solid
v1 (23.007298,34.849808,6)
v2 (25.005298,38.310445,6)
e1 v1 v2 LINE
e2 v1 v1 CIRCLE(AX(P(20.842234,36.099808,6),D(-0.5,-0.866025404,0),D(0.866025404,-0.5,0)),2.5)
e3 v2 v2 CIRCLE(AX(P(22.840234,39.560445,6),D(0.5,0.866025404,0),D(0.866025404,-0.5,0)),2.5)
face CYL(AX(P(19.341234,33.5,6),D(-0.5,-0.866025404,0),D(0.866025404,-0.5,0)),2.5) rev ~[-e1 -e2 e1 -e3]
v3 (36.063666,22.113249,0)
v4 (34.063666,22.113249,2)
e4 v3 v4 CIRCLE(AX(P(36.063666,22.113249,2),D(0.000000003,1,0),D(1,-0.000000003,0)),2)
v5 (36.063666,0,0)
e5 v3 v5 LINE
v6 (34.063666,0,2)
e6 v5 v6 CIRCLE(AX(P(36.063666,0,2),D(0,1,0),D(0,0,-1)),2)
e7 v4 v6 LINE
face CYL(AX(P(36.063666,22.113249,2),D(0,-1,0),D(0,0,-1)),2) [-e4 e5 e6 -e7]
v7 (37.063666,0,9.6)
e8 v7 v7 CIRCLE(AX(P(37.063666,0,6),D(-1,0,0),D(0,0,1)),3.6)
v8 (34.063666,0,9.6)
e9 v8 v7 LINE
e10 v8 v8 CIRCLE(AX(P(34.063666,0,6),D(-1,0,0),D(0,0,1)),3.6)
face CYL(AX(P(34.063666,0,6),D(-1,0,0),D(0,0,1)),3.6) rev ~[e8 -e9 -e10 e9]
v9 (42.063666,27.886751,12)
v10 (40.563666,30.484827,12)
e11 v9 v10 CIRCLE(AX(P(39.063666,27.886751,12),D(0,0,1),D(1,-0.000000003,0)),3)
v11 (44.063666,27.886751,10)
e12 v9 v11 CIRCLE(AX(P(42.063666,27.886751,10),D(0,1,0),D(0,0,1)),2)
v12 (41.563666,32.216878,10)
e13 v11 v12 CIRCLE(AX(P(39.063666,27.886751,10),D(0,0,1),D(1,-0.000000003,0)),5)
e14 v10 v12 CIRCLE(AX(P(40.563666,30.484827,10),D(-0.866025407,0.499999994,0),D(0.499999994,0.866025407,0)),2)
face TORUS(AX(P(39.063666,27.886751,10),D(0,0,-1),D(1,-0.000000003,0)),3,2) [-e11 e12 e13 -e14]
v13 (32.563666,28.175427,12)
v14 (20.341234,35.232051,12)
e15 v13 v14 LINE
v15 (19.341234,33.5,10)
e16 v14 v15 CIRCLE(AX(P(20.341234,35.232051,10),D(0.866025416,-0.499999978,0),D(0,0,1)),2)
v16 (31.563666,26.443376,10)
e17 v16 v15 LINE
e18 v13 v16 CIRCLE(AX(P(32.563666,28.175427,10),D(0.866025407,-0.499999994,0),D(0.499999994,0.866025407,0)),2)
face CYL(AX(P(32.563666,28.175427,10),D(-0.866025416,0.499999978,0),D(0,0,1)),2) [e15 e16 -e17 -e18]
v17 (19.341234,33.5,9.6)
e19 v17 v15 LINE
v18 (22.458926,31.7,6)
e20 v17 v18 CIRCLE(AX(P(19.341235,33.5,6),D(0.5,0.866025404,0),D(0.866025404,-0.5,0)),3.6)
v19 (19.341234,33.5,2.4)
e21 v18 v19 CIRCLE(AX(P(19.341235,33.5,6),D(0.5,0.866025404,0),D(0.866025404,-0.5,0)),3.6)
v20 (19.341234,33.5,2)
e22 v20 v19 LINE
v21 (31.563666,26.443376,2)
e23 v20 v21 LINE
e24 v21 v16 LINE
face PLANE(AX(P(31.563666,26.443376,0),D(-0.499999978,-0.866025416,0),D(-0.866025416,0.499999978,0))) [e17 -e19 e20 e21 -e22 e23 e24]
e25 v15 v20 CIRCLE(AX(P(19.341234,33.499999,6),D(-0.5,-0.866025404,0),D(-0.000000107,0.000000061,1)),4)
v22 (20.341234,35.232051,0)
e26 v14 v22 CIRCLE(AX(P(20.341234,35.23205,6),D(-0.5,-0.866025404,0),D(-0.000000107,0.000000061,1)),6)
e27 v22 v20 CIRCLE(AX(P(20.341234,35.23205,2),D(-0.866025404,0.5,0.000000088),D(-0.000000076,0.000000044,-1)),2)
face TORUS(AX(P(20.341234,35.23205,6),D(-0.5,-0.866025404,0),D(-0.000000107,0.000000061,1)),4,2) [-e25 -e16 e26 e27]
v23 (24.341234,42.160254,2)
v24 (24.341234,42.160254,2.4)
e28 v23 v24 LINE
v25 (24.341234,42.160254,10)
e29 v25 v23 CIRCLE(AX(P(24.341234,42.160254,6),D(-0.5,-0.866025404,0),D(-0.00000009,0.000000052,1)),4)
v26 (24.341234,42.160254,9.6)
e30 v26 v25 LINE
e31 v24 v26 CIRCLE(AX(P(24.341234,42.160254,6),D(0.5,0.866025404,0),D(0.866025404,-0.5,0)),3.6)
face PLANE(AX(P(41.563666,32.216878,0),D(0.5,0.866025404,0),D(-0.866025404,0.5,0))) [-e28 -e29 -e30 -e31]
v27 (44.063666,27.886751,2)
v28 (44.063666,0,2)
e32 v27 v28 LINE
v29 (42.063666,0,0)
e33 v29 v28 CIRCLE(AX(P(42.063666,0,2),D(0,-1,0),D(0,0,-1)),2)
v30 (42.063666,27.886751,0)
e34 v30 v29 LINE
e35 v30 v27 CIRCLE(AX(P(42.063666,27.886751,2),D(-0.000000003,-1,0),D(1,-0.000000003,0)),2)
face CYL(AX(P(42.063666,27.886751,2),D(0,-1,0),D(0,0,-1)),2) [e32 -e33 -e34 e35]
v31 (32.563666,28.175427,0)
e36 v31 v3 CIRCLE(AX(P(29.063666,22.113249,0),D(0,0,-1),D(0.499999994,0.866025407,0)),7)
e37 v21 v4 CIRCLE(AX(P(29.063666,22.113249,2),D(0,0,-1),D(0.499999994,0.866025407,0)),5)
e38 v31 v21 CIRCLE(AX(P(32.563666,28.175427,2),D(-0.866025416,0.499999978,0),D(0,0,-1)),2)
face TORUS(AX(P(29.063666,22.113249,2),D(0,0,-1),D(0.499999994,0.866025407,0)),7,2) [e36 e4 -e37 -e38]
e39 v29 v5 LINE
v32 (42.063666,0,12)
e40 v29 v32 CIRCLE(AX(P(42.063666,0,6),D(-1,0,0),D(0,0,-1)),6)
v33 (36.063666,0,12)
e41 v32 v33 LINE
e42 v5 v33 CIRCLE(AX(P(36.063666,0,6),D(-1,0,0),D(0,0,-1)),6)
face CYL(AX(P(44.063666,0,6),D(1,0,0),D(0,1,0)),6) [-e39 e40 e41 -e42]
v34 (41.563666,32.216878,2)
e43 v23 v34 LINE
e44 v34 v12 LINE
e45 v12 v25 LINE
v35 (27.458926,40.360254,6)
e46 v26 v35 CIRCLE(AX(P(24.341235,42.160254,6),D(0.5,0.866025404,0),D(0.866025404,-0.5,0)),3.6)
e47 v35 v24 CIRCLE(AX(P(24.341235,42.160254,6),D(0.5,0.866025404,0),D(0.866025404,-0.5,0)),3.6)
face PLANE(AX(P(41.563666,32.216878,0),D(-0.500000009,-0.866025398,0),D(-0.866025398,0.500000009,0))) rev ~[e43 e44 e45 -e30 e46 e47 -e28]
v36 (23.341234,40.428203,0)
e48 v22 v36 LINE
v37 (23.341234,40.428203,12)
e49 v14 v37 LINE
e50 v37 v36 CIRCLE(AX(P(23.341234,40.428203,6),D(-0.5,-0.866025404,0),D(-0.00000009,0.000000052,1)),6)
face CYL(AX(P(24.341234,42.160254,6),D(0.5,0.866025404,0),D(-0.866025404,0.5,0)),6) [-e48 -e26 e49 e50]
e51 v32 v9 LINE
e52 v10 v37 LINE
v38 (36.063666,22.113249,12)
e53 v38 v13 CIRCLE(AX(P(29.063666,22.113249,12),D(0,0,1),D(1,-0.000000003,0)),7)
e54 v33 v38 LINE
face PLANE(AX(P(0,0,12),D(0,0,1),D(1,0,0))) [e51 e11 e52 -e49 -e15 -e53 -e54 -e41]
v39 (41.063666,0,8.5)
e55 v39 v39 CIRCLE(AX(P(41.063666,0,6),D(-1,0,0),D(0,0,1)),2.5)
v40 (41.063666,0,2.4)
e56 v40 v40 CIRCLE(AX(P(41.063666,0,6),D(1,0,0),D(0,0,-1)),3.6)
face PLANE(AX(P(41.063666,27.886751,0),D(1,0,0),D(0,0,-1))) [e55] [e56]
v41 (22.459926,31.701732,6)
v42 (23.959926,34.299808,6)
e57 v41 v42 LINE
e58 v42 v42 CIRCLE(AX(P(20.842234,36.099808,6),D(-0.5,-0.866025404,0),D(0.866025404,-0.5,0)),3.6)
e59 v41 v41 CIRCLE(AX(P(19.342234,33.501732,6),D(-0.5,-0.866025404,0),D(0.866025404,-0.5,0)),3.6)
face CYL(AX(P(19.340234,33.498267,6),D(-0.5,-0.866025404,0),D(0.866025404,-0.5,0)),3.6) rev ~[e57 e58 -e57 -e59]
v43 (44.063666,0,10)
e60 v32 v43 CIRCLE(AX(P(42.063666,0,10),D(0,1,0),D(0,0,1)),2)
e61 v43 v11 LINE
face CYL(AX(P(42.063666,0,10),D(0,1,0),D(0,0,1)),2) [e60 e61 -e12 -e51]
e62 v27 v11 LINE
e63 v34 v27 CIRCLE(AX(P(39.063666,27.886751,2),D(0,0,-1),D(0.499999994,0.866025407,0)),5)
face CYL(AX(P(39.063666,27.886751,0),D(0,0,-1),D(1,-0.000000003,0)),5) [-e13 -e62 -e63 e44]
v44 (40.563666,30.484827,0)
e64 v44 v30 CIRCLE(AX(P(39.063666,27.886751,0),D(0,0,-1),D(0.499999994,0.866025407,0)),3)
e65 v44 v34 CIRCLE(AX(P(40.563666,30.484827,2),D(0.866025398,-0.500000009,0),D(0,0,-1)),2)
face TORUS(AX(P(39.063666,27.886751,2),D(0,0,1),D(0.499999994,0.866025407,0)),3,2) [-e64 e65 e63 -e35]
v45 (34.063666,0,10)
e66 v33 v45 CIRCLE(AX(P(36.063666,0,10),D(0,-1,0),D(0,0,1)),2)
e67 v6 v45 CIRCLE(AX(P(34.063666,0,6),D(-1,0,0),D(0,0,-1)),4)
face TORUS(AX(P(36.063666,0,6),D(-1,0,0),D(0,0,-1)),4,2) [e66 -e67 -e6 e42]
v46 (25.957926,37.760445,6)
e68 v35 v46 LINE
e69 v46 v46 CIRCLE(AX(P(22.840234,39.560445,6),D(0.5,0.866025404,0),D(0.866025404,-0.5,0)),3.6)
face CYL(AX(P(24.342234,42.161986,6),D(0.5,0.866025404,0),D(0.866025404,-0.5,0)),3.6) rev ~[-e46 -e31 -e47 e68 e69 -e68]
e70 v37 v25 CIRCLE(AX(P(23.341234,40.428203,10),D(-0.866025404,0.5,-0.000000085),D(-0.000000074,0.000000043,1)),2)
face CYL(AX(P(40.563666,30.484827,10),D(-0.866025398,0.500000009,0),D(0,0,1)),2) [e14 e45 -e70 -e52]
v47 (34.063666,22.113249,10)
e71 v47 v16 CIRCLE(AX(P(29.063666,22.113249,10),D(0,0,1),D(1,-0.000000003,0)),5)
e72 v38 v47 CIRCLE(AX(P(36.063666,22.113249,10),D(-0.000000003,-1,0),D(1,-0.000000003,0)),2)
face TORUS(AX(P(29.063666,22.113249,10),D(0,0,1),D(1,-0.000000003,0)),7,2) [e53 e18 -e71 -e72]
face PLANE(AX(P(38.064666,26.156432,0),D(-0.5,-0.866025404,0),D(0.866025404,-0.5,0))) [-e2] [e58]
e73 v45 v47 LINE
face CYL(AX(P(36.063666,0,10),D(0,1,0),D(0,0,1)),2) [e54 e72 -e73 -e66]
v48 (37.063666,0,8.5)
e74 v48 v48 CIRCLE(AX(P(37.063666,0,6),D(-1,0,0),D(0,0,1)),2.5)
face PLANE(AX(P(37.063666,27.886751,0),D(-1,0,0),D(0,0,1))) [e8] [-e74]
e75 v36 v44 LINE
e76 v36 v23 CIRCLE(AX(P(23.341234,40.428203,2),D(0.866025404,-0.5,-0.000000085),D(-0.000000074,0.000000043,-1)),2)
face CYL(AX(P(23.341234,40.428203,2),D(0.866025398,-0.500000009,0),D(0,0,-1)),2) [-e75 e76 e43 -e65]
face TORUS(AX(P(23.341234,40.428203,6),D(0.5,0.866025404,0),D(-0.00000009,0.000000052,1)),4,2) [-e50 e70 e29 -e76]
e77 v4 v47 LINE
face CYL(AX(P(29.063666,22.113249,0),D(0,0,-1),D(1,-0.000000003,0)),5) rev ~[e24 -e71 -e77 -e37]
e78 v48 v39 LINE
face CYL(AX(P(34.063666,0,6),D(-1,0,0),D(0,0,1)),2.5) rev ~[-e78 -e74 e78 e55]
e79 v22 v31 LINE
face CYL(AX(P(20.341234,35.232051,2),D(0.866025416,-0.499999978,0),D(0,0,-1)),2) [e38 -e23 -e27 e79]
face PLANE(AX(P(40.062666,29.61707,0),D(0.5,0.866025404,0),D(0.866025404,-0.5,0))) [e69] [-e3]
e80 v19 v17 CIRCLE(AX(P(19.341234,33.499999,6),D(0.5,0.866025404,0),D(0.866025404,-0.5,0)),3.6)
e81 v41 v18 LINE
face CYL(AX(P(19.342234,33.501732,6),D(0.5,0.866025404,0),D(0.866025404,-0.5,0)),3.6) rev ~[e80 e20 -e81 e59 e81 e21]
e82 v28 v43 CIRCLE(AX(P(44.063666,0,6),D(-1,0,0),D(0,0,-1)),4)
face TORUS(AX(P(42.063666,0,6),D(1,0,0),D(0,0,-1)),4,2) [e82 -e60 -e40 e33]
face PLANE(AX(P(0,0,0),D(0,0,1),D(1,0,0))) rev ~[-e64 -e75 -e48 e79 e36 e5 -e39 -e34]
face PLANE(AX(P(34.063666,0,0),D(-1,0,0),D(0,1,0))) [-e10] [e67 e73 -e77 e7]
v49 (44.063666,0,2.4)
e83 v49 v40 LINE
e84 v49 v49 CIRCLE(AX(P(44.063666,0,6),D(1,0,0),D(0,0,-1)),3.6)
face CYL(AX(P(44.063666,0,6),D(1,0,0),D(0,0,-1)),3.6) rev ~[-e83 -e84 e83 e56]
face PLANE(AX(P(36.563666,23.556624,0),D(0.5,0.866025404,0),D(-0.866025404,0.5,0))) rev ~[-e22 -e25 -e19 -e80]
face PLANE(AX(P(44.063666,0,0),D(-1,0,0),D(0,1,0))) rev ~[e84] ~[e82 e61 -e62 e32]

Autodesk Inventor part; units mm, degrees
ref_plane "YZ Plane" through (0, 0, 0) normal (1, 0, 0) x (0, 1, 0)
sketch "Sketch1" plane through (0, 0, 0) normal (0, 0, 1) x (1, 0, 0)
  line L0 (44.063666, 0) -> (0, 0)
  line L1 (0, 0) -> (34.830781, 60.328682)
  line L2 (34.063666, 0) -> (34.063666, 22.113249)
  line L3 (31.563666, 26.443376) -> (19.341234, 33.5)
  line L4 (44.063666, 0) -> (44.063666, 27.886751)
  line L5 (41.563666, 32.216878) -> (24.341234, 42.160254)
  arc A0 (34.063666, 22.113249) -> (31.563666, 26.443376) centre (29.063666, 22.113249) ccw
  arc A1 (44.063666, 27.886751) -> (41.563666, 32.216878) centre (39.063666, 27.886751) ccw
  line L6 (24.341234, 42.160254) -> (19.341234, 33.5)
  line L7 (24.341234, 42.160254) -> (41.563666, 32.216878)
  line L8 (19.341234, 33.5) -> (31.563666, 26.443376)
  line L9 (34.063666, 0) -> (44.063666, 0)
  line L10 (44.063666, 0) -> (44.063666, 27.886751)
  line L11 (34.063666, 0) -> (44.063666, 0)
  line L12 (44.063666, 0) -> (44.063666, 27.886751)
  line L13 (41.563666, 32.216878) -> (24.341234, 42.160254)
  line L14 (24.341234, 42.160254) -> (19.341234, 33.5)
  line L15 (19.341234, 33.5) -> (31.563666, 26.443376)
  line L16 (34.063666, 22.113249) -> (34.063666, 0)
  point P0 (25, 43.30127)
  point P1 (34.063666, 25)
  dimension "d37" = 60
  dimension "d38" = 10
  dimension "d39" = 10
  dimension "d40" = 0
  dimension "d41" = 0
  dimension "d42" = 25
  dimension "d43" = 17
  dimension "d44" = 120
  dimension "d45" = 5
extrude "Extrusion1" add sketch "Sketch1" along normal blind 12 contours L0 L2 A0 L3 L1 L5 A1 L4
ref_plane "Work Plane1" through (41.563666, 32.216878, 0) normal (0.5, 0.8660254, 0) x (-0.8660254, 0.5, 0)
sketch "Sketch2" plane through (41.563666, 32.216878, 0) normal (0.5, 0.8660254, 0) x (-0.8660254, 0.5, 0)
  circle A0 centre (19.886751, 6) radius 6
  line L0 (19.886751, 0) -> (19.886751, 12)
  line L1 (0, 12) -> (19.886751, 12)
  dimension "d5" = 12
  dimension "d47" = 0
  dimension "d48" = 6
extrude "Extrusion2" add sketch "Sketch2" against normal blind 10
ref_plane "Work Plane2" through (44.063666, 27.886751, 0) normal (1, 0, 0) x (0, 1, 0)
sketch "Sketch3" plane through (44.063666, 27.886751, 0) normal (1, 0, 0) x (0, 1, 0)
  circle A0 centre (-27.886751, 6) radius 6
  line L0 (-27.886751, 0) -> (-27.886751, 12)
  line L1 (-27.886751, 0) -> (0, 0)
  point P0 (43.30127, 10)
  point P1 (5.613249, 12)
  dimension "d10" = 12
  dimension "d49" = 0
  dimension "d50" = 6
extrude "Extrusion3" add sketch "Sketch3" against normal blind 10
sketch "Sketch4" plane through (36.563666, 23.556624, 0) normal (-0.5, -0.8660254, 0) x (0.8660254, -0.5, 0)
  circle A0 centre (-19.886751, 6) radius 2.5
  circle A1 centre (-19.886751, 6) radius 6
  point P0 (-19.886751, 0)
  point P1 (-19.886751, 12)
  dimension "d15" = 5
extrude "Extrusion4" cut sketch "Sketch4" along normal through all both and the other way through all contours A0
sketch "Sketch5" plane through (34.063666, 27.886751, 0) normal (-1, 0, 0) x (0, 0, 1)
  circle A0 centre (6, -27.886751) radius 2.5
  arc A1 (0, -27.886751) -> (12, -27.886751) centre (6, -27.886751) ccw
  dimension "d18" = 5
extrude "Extrusion5" cut sketch "Sketch5" along normal through all both and the other way through all
sketch "Sketch6" plane through (41.563666, 32.216878, 0) normal (0.5, 0.8660254, 0) x (0.8660254, -0.5, 0)
  circle A0 centre (-19.886751, -6) radius 3.6
  circle A1 centre (-19.886751, -6) radius 2.5
  arc A2 (-19.886751, 0) -> (-19.886751, 0) centre (-19.886751, -6) ccw
  point P0 (0, -10)
  dimension "d21" = 5
  dimension "d22" = 7.2
extrude "Extrusion6" cut sketch "Sketch6" against normal blind 3 contours A0
sketch "Sketch7" plane through (36.563666, 23.556624, 0) normal (-0.5, -0.8660254, 0) x (0.8660254, -0.5, 0)
  circle A0 centre (-19.886751, 6) radius 3.6
  circle A1 centre (-19.886751, 6) radius 2.5
  arc A2 (-17.386751, 6) -> (-17.386751, 6) centre (-19.886751, 6) ccw
  point P0 (-19.886751, 0)
  dimension "d25" = 5
  dimension "d26" = 7.2
extrude "Extrusion7" cut sketch "Sketch7" along normal mid plane 6
sketch "Sketch8" plane through (34.063666, 27.886751, 0) normal (-1, 0, 0) x (0, 0, 1)
  circle A0 centre (6, -27.886751) radius 3.6
  circle A1 centre (6, -27.886751) radius 2.5
  arc A2 (8.5, -27.886751) -> (8.5, -27.886751) centre (6, -27.886751) ccw
  point P0 (0, -27.886751)
  dimension "d29" = 7.2
  dimension "d30" = 5
extrude "Extrusion8" cut sketch "Sketch8" along normal mid plane 6
sketch "Sketch9" plane through (44.063666, 27.886751, 0) normal (1, 0, 0) x (0, 0, -1)
  circle A0 centre (-6, -27.886751) radius 3.6
  circle A1 centre (-6, -27.886751) radius 2.5
  circle A2 centre (-6, -27.886751) radius 2.5
  point P0 (0, -27.886751)
  dimension "d33" = 5
  dimension "d34" = 7.2
extrude "Extrusion9" cut sketch "Sketch9" against normal blind 3
fillet "Fillet1" radius 2 16 edges at (19.1451, 45.1603, 6) (32.9524, 37.1886, 0) (43.3938, 30.3868, 0) (44.0637, 13.9434, 0) (44.0637, -6, 6) (44.0637, 13.9434, 12) (43.3938, 30.3868, 12) (32.9524, 37.1886, 12) (33.3938, 24.6132, 12) (34.0637, 11.0566, 12) (34.0637, -6, 6) (34.0637, 11.0566, 0) (33.3938, 24.6132, 0) (25.4524, 29.9717, 0) (14.1451, 36.5, 6) (25.4524, 29.9717, 12)
equation "\"d38\" = d46"
equation "\"d39\" = d46"
equation "\"d3\" = width"
equation "\"d5\" = width"
equation "\"d48\" = 0.5 * width"
equation "\"d8\" = thickness"
equation "\"d10\" = width"
equation "\"d50\" = 0.5 * width"
equation "\"d13\" = thickness"
equation "\"thickness\" = thickness_1"
equation "\"width\" = width_1"
equation "\"d46\" = 10"
equation "\"thickness_1\" = 10"
equation "\"width_1\" = 12"
properties part number "Link2"
